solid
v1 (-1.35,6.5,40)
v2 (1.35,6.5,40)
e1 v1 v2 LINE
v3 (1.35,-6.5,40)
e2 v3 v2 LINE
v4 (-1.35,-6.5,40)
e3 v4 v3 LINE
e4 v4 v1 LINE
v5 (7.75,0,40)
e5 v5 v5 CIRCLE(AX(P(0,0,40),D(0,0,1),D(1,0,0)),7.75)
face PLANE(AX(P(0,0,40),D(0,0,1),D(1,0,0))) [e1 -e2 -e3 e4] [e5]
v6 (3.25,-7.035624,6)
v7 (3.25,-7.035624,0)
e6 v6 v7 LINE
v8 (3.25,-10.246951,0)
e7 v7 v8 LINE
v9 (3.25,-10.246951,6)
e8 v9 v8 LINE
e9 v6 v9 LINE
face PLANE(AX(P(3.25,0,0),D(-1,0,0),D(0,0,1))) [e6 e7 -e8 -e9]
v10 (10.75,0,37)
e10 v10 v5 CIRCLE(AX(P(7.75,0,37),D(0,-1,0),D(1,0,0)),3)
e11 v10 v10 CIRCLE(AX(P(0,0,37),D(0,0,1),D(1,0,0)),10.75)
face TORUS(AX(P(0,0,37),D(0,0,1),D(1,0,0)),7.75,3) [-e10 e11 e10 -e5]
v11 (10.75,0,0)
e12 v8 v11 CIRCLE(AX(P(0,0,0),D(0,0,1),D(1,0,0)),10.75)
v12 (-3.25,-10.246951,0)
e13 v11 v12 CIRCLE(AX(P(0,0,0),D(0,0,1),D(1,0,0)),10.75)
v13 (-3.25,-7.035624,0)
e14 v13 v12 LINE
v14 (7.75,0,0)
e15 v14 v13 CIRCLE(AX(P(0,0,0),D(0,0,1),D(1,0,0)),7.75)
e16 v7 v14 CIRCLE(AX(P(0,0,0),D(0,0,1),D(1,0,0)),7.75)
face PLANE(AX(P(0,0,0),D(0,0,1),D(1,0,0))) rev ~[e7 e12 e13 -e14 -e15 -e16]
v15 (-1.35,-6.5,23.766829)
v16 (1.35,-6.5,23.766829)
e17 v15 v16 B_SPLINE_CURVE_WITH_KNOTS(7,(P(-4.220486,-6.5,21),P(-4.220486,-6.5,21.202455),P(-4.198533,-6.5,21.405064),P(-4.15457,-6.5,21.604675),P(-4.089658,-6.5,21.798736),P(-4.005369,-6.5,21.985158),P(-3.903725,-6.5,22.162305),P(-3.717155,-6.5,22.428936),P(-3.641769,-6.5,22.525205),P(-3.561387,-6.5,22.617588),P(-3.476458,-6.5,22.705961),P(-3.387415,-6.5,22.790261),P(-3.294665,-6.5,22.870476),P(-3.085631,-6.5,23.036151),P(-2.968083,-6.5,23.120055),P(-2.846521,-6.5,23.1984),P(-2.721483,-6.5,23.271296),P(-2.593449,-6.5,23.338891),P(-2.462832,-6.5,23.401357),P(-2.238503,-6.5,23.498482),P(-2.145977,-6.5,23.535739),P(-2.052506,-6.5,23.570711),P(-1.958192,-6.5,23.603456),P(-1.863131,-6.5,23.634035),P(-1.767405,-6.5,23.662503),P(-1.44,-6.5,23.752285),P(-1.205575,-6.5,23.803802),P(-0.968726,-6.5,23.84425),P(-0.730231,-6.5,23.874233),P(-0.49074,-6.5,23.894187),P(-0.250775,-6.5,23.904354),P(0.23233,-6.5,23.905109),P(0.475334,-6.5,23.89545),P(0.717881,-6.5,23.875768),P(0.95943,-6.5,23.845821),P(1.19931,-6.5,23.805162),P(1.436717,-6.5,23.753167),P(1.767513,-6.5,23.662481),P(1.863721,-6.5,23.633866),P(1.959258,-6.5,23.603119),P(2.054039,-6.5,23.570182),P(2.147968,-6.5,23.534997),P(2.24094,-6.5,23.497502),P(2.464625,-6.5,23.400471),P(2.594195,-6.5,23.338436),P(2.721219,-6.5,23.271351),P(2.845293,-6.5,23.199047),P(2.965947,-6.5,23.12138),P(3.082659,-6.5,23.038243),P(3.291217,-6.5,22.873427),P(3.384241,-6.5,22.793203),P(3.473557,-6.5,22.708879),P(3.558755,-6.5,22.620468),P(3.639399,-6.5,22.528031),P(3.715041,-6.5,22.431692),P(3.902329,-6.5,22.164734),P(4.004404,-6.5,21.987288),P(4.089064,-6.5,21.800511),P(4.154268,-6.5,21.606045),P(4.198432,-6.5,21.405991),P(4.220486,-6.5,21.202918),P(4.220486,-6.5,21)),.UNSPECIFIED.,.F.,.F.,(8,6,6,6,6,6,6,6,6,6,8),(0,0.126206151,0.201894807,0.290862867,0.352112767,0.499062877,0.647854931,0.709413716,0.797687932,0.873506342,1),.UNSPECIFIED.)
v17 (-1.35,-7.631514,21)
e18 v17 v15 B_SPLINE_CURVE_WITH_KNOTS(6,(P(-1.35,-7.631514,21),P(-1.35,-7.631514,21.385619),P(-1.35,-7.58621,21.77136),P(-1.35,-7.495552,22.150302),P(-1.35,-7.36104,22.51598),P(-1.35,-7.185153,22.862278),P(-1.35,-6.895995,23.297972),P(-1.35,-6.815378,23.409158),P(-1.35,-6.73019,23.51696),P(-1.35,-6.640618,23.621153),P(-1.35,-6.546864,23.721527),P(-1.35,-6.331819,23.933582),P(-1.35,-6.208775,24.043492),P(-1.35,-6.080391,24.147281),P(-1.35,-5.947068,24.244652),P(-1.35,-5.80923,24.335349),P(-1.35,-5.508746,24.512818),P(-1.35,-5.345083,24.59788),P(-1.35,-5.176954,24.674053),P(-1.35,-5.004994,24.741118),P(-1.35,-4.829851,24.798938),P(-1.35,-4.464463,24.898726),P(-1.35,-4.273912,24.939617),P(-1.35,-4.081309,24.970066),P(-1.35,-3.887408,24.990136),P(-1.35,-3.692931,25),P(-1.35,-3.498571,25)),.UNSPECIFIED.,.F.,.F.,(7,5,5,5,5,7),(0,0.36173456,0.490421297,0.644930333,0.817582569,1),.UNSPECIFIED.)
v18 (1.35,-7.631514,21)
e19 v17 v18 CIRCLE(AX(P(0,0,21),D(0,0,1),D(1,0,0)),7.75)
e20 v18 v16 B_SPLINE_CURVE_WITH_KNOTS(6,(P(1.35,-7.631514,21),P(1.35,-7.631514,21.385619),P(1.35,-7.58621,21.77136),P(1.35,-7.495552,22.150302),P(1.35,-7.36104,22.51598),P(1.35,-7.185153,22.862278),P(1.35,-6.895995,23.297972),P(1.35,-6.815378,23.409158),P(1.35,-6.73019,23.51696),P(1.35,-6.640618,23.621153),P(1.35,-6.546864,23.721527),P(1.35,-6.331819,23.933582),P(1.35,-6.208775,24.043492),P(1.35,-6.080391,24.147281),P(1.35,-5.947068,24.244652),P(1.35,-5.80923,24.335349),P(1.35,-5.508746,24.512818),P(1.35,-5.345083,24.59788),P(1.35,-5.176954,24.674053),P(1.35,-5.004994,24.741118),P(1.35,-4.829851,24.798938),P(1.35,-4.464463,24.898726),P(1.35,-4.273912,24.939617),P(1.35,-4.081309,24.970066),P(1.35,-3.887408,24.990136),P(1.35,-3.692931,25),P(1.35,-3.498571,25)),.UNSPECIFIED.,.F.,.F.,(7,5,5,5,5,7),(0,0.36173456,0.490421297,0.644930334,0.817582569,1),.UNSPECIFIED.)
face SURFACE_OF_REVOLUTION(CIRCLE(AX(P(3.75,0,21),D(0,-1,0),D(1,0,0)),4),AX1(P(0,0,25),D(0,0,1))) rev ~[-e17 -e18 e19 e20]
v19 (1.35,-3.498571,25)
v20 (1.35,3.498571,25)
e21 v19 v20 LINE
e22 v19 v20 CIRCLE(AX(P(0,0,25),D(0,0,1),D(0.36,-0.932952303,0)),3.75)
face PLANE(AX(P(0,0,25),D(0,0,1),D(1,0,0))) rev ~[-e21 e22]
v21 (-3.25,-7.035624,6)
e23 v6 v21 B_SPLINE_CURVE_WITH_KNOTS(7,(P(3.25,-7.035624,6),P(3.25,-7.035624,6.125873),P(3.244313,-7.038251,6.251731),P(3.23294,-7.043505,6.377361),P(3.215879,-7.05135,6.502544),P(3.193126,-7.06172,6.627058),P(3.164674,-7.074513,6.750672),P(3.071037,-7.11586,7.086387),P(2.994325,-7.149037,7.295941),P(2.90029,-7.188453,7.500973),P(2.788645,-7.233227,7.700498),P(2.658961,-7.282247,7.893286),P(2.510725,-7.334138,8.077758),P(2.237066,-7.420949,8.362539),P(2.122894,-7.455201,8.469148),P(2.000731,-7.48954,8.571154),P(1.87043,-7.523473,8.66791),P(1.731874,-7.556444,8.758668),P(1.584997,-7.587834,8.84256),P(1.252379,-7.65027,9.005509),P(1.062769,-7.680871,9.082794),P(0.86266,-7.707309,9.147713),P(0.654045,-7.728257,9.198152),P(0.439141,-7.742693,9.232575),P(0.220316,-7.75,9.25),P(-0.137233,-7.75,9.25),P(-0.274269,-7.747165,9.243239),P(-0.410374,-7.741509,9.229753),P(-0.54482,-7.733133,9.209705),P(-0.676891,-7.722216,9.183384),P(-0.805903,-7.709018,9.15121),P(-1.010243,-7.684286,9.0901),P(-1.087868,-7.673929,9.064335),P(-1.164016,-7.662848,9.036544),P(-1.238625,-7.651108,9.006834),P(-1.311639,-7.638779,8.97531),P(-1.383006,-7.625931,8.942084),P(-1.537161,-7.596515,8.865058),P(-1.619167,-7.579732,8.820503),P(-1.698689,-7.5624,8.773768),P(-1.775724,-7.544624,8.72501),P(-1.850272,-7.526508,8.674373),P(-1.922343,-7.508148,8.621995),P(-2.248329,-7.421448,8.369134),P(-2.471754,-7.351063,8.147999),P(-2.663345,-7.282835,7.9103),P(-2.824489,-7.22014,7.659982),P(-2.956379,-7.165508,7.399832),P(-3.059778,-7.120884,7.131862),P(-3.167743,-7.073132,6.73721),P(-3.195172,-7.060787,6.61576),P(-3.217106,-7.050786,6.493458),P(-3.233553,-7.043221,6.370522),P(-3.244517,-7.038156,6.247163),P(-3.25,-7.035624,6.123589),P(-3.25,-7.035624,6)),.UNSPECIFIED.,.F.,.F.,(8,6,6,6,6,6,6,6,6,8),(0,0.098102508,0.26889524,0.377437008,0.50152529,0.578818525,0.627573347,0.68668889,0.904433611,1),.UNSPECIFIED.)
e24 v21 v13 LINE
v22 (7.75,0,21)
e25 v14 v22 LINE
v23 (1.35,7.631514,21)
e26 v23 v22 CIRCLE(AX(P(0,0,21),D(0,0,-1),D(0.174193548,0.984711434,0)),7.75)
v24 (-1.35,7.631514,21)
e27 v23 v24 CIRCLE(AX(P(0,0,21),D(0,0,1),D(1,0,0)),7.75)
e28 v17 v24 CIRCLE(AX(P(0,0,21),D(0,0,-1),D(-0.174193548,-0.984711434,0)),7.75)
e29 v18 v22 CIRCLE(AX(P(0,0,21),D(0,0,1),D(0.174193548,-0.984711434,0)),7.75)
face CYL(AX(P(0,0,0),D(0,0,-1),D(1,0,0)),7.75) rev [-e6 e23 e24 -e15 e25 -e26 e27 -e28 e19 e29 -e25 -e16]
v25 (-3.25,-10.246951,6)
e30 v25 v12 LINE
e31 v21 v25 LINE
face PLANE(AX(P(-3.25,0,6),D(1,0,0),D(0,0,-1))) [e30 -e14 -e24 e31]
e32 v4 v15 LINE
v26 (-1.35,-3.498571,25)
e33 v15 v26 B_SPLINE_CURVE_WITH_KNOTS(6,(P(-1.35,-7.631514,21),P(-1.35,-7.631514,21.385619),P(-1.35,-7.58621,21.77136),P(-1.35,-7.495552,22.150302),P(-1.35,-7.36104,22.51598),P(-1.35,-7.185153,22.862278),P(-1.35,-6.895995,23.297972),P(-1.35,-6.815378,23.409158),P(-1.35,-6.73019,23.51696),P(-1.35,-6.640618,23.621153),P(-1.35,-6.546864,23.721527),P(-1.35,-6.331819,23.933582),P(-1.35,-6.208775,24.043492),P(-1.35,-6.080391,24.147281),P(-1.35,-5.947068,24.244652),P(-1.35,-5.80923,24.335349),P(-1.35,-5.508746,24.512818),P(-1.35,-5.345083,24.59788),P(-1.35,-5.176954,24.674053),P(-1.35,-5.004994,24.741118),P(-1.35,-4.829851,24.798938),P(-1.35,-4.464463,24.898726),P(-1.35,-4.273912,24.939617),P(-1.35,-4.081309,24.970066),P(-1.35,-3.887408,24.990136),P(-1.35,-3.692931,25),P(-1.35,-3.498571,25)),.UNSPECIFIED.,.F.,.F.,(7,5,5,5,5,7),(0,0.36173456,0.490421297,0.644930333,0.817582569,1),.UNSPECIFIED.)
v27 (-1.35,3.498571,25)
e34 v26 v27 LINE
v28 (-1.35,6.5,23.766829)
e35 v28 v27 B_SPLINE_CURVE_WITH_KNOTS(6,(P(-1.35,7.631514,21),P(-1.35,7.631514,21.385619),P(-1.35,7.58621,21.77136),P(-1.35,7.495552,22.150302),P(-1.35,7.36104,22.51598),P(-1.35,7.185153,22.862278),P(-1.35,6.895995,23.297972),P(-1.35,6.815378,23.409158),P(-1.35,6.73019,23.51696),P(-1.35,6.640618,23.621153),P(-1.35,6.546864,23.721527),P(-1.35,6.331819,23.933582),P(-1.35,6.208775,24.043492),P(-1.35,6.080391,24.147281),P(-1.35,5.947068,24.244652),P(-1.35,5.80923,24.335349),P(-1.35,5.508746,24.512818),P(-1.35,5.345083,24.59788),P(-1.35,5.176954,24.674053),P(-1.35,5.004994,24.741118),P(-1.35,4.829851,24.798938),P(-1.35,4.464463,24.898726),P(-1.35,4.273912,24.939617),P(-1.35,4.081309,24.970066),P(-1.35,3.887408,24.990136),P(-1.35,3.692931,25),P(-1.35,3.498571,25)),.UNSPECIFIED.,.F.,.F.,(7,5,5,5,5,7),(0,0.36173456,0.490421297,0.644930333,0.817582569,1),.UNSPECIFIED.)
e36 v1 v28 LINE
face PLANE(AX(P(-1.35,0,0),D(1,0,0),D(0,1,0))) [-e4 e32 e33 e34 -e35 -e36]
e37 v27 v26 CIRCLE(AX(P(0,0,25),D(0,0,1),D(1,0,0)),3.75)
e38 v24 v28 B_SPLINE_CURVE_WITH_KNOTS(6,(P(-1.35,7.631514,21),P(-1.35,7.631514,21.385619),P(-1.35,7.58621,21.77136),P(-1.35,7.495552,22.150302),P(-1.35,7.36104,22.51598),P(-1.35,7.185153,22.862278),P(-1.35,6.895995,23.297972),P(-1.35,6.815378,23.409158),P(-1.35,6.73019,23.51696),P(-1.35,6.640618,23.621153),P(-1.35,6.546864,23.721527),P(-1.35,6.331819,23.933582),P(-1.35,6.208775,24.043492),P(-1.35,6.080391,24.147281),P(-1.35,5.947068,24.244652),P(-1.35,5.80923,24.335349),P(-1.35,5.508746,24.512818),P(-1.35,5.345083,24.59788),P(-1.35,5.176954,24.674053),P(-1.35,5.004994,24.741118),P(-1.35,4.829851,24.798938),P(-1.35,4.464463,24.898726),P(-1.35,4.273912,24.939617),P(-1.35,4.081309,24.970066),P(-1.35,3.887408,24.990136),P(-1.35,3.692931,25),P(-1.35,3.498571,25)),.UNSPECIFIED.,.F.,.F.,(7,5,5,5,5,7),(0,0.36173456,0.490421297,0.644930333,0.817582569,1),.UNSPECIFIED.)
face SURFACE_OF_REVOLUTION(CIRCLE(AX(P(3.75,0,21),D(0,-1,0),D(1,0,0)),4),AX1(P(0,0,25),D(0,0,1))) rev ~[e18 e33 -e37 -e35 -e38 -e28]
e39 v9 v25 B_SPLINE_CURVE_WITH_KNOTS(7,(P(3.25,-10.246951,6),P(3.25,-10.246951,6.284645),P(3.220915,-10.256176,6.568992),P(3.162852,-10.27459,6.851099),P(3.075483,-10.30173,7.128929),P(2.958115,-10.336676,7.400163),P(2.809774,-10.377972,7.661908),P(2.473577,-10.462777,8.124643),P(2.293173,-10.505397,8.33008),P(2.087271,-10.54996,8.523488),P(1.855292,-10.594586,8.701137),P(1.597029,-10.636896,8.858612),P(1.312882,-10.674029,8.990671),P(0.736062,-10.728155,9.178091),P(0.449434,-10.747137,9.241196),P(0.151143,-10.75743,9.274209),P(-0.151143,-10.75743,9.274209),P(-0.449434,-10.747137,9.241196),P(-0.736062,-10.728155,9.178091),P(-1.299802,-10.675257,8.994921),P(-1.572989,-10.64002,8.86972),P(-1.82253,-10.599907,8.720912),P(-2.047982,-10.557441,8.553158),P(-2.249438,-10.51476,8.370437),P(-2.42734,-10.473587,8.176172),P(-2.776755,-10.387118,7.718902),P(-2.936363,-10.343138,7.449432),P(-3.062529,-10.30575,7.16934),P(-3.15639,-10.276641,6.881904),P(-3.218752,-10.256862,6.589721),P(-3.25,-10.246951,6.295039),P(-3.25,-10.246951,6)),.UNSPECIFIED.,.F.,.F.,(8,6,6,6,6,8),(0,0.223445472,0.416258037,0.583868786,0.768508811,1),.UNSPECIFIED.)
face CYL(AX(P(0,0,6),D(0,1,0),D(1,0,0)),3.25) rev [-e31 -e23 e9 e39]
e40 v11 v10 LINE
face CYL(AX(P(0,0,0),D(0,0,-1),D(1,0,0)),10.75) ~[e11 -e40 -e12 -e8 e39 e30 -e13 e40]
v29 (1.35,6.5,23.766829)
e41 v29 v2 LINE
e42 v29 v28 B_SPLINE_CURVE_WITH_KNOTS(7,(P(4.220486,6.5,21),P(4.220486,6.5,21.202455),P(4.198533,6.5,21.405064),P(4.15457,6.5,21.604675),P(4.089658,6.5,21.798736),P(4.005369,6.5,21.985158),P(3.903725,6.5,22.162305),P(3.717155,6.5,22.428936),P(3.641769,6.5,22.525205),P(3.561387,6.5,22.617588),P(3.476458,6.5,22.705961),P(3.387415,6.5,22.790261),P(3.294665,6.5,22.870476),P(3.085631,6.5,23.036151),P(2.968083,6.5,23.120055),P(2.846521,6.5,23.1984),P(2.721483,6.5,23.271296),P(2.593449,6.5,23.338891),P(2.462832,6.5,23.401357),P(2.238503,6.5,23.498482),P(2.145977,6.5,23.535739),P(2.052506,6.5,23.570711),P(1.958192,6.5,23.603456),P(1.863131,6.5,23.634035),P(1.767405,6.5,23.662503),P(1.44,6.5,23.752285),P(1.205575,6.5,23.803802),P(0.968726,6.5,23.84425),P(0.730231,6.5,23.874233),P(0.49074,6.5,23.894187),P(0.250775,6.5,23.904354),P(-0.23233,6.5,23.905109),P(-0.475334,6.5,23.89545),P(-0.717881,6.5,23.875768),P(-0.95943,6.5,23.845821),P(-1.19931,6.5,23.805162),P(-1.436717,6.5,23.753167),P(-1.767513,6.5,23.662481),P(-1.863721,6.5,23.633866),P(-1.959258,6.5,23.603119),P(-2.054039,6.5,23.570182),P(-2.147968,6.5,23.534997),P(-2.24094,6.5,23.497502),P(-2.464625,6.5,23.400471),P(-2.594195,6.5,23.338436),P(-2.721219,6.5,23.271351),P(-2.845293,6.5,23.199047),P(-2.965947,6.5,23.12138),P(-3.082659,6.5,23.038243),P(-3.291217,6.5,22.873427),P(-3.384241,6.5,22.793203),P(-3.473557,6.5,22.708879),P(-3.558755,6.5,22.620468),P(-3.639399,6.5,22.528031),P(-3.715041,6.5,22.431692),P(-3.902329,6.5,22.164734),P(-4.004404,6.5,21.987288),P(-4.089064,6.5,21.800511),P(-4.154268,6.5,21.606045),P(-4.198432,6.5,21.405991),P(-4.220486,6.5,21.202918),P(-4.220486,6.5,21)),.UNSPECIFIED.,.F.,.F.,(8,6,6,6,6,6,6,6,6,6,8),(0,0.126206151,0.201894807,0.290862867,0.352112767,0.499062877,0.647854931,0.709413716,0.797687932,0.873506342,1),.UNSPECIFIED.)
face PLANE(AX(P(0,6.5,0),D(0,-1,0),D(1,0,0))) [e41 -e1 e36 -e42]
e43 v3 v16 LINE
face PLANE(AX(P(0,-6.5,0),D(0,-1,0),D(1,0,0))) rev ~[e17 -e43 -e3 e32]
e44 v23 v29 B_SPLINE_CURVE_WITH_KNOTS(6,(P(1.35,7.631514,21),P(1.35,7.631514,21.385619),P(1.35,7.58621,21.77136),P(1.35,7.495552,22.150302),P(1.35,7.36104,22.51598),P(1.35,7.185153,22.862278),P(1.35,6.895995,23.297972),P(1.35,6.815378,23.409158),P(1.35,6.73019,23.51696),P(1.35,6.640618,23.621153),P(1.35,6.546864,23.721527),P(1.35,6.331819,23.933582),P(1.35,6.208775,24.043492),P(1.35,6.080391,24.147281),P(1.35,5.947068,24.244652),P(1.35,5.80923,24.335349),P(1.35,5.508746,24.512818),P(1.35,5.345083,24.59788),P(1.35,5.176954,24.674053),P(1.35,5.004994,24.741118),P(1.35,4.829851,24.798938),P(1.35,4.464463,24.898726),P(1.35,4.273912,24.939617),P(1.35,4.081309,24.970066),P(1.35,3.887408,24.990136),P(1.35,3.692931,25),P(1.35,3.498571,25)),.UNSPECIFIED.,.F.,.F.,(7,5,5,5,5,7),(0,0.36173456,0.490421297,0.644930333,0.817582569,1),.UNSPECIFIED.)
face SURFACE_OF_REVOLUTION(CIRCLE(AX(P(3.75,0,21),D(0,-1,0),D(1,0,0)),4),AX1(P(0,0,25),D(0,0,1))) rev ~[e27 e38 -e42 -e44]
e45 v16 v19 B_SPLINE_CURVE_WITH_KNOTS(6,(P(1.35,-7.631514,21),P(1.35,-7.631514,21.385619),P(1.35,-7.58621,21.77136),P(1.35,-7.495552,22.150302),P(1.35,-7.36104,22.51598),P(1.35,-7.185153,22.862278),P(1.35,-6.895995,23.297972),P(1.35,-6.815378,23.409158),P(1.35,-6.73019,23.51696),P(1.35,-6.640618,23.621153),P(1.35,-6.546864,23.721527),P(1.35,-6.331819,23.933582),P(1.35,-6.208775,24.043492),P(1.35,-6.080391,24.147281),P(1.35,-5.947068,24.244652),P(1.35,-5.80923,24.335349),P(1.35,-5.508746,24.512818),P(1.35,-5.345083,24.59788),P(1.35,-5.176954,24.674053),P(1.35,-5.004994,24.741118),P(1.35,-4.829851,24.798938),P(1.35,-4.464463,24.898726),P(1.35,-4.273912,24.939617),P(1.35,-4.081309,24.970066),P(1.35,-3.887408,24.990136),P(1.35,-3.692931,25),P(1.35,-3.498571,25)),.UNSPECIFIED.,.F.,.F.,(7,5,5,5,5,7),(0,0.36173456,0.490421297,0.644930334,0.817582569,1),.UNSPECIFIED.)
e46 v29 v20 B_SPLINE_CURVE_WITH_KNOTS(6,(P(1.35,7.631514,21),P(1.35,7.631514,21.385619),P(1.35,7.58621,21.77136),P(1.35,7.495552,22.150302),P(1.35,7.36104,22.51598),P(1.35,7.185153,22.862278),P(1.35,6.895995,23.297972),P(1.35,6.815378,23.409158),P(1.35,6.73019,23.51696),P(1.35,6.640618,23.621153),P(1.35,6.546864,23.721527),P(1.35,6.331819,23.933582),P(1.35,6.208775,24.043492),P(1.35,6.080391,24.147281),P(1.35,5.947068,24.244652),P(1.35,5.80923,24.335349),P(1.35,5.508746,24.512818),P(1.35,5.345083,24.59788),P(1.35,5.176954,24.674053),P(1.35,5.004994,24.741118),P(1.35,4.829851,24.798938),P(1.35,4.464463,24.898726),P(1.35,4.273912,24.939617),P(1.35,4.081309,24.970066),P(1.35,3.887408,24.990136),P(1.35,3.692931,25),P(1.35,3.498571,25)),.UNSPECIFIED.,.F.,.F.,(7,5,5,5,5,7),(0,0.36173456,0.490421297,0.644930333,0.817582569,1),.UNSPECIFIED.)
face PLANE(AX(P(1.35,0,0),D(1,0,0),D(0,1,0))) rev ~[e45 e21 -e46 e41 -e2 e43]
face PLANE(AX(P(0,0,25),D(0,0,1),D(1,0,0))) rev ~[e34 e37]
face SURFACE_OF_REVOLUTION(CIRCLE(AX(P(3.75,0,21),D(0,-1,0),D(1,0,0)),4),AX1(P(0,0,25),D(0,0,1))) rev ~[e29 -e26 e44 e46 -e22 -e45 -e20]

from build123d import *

# Parameters (mm, degrees)
F0_R     = 10.75
F0_R_2   = 7.75
F1_DEPTH = 40
F3_DEPTH = 15
F4_DEPTH = 25
F7_R     = 3
F6_W     = 2.7
F6_H     = 13
F8_DEPTH = 25


# Not quite as in the source:
# - a fillet or chamfer that OpenCascade refuses, or shapes differently, is made with other operations: its cross-section is extruded or revolved along the edge and cut away or added


with BuildPart() as f1:
    # F0 (on Top) → F1 (new body)
    with BuildSketch(Plane.XY):
        Circle(F0_R)
        Circle(F0_R_2, mode=Mode.SUBTRACT)
        Circle(F0_R_2)
    extrude(amount=F1_DEPTH)

    # F2 (on Front) → F3 (cut)
    with BuildSketch(Plane.XZ):
        with BuildLine():
            Line((-3.25, 6), (-3.25, 0))
            Line((-3.25, 0), (3.25, 0))
            Line((3.25, 0), (3.25, 6))
            ThreePointArc((3.25, 6), (0, 9.25), (-3.25, 6))
        make_face()
    extrude(amount=F3_DEPTH, mode=Mode.SUBTRACT)

    # F0 (on Top) → F4 (cut)
    with BuildSketch(Plane.XY):
        Circle(F0_R_2)
    extrude(amount=F4_DEPTH, mode=Mode.SUBTRACT)

    # F7
    f7_edges = [f1.edges().sort_by_distance(p)[0] for p in [
        (-10.75, 0, 40),
    ]]
    fillet(f7_edges, radius=F7_R)

    # F6 (on offset) → F8 (cut)
    with BuildSketch(Plane.XY.offset(40)):
        Rectangle(F6_W, F6_H)
    extrude(amount=-F8_DEPTH, mode=Mode.SUBTRACT)

    # F9: fillet of radius 4 on 1 edges, made by hand


with BuildPart() as f9_tool2:
    # F9_s3 → F9_t4 (revolve)
    with BuildSketch(Plane.XZ):
        with BuildLine():
            ThreePointArc((7.75, 21), (6.5784271247, 23.8284271247), (3.75, 25))
            Line((3.75, 25), (7.75, 25))
            Line((7.75, 25), (7.75, 21))
        make_face()
    revolve(axis=Axis((0, 0, 25), (0, 0, 1)))

    split(bisect_by=Plane.YZ.offset(1.35), keep=Keep.TOP)


with BuildPart() as f1_1:
    add(f1.part)

    # F9_t1: union F9_tool2
    add(f9_tool2.part)


with BuildPart() as f9_tool7:
    # F9_s8 → F9_t9 (revolve)
    with BuildSketch(Plane.XZ):
        with BuildLine():
            ThreePointArc((7.75, 21), (6.5784271247, 23.8284271247), (3.75, 25))
            Line((3.75, 25), (7.75, 25))
            Line((7.75, 25), (7.75, 21))
        make_face()
    revolve(axis=Axis((0, 0, 25), (0, 0, 1)))

    split(bisect_by=Plane.YZ.offset(-1.35), keep=Keep.BOTTOM)


with BuildPart() as f1_2:
    add(f1_1.part)

    # F9_t6: union F9_tool7
    add(f9_tool7.part)


with BuildPart() as f9_tool12:
    # F9_s13 → F9_t14 (revolve)
    with BuildSketch(Plane.XZ):
        with BuildLine():
            ThreePointArc((7.75, 21), (6.5784271247, 23.8284271247), (3.75, 25))
            Line((3.75, 25), (7.75, 25))
            Line((7.75, 25), (7.75, 21))
        make_face()
    revolve(axis=Axis((0, 0, 25), (0, 0, 1)))

    split(bisect_by=Plane.XZ.offset(-6.5), keep=Keep.BOTTOM)


with BuildPart() as f1_3:
    add(f1_2.part)

    # F9_t11: union F9_tool12
    add(f9_tool12.part)


with BuildPart() as f9_tool17:
    # F9_s18 → F9_t19 (revolve)
    with BuildSketch(Plane.XZ):
        with BuildLine():
            ThreePointArc((7.75, 21), (6.5784271247, 23.8284271247), (3.75, 25))
            Line((3.75, 25), (7.75, 25))
            Line((7.75, 25), (7.75, 21))
        make_face()
    revolve(axis=Axis((0, 0, 25), (0, 0, 1)))

    split(bisect_by=Plane.XZ.offset(6.5), keep=Keep.TOP)


with BuildPart() as f1_4:
    add(f1_3.part)

    # F9_t16: union F9_tool17
    add(f9_tool17.part)


solid = f1_4.part
